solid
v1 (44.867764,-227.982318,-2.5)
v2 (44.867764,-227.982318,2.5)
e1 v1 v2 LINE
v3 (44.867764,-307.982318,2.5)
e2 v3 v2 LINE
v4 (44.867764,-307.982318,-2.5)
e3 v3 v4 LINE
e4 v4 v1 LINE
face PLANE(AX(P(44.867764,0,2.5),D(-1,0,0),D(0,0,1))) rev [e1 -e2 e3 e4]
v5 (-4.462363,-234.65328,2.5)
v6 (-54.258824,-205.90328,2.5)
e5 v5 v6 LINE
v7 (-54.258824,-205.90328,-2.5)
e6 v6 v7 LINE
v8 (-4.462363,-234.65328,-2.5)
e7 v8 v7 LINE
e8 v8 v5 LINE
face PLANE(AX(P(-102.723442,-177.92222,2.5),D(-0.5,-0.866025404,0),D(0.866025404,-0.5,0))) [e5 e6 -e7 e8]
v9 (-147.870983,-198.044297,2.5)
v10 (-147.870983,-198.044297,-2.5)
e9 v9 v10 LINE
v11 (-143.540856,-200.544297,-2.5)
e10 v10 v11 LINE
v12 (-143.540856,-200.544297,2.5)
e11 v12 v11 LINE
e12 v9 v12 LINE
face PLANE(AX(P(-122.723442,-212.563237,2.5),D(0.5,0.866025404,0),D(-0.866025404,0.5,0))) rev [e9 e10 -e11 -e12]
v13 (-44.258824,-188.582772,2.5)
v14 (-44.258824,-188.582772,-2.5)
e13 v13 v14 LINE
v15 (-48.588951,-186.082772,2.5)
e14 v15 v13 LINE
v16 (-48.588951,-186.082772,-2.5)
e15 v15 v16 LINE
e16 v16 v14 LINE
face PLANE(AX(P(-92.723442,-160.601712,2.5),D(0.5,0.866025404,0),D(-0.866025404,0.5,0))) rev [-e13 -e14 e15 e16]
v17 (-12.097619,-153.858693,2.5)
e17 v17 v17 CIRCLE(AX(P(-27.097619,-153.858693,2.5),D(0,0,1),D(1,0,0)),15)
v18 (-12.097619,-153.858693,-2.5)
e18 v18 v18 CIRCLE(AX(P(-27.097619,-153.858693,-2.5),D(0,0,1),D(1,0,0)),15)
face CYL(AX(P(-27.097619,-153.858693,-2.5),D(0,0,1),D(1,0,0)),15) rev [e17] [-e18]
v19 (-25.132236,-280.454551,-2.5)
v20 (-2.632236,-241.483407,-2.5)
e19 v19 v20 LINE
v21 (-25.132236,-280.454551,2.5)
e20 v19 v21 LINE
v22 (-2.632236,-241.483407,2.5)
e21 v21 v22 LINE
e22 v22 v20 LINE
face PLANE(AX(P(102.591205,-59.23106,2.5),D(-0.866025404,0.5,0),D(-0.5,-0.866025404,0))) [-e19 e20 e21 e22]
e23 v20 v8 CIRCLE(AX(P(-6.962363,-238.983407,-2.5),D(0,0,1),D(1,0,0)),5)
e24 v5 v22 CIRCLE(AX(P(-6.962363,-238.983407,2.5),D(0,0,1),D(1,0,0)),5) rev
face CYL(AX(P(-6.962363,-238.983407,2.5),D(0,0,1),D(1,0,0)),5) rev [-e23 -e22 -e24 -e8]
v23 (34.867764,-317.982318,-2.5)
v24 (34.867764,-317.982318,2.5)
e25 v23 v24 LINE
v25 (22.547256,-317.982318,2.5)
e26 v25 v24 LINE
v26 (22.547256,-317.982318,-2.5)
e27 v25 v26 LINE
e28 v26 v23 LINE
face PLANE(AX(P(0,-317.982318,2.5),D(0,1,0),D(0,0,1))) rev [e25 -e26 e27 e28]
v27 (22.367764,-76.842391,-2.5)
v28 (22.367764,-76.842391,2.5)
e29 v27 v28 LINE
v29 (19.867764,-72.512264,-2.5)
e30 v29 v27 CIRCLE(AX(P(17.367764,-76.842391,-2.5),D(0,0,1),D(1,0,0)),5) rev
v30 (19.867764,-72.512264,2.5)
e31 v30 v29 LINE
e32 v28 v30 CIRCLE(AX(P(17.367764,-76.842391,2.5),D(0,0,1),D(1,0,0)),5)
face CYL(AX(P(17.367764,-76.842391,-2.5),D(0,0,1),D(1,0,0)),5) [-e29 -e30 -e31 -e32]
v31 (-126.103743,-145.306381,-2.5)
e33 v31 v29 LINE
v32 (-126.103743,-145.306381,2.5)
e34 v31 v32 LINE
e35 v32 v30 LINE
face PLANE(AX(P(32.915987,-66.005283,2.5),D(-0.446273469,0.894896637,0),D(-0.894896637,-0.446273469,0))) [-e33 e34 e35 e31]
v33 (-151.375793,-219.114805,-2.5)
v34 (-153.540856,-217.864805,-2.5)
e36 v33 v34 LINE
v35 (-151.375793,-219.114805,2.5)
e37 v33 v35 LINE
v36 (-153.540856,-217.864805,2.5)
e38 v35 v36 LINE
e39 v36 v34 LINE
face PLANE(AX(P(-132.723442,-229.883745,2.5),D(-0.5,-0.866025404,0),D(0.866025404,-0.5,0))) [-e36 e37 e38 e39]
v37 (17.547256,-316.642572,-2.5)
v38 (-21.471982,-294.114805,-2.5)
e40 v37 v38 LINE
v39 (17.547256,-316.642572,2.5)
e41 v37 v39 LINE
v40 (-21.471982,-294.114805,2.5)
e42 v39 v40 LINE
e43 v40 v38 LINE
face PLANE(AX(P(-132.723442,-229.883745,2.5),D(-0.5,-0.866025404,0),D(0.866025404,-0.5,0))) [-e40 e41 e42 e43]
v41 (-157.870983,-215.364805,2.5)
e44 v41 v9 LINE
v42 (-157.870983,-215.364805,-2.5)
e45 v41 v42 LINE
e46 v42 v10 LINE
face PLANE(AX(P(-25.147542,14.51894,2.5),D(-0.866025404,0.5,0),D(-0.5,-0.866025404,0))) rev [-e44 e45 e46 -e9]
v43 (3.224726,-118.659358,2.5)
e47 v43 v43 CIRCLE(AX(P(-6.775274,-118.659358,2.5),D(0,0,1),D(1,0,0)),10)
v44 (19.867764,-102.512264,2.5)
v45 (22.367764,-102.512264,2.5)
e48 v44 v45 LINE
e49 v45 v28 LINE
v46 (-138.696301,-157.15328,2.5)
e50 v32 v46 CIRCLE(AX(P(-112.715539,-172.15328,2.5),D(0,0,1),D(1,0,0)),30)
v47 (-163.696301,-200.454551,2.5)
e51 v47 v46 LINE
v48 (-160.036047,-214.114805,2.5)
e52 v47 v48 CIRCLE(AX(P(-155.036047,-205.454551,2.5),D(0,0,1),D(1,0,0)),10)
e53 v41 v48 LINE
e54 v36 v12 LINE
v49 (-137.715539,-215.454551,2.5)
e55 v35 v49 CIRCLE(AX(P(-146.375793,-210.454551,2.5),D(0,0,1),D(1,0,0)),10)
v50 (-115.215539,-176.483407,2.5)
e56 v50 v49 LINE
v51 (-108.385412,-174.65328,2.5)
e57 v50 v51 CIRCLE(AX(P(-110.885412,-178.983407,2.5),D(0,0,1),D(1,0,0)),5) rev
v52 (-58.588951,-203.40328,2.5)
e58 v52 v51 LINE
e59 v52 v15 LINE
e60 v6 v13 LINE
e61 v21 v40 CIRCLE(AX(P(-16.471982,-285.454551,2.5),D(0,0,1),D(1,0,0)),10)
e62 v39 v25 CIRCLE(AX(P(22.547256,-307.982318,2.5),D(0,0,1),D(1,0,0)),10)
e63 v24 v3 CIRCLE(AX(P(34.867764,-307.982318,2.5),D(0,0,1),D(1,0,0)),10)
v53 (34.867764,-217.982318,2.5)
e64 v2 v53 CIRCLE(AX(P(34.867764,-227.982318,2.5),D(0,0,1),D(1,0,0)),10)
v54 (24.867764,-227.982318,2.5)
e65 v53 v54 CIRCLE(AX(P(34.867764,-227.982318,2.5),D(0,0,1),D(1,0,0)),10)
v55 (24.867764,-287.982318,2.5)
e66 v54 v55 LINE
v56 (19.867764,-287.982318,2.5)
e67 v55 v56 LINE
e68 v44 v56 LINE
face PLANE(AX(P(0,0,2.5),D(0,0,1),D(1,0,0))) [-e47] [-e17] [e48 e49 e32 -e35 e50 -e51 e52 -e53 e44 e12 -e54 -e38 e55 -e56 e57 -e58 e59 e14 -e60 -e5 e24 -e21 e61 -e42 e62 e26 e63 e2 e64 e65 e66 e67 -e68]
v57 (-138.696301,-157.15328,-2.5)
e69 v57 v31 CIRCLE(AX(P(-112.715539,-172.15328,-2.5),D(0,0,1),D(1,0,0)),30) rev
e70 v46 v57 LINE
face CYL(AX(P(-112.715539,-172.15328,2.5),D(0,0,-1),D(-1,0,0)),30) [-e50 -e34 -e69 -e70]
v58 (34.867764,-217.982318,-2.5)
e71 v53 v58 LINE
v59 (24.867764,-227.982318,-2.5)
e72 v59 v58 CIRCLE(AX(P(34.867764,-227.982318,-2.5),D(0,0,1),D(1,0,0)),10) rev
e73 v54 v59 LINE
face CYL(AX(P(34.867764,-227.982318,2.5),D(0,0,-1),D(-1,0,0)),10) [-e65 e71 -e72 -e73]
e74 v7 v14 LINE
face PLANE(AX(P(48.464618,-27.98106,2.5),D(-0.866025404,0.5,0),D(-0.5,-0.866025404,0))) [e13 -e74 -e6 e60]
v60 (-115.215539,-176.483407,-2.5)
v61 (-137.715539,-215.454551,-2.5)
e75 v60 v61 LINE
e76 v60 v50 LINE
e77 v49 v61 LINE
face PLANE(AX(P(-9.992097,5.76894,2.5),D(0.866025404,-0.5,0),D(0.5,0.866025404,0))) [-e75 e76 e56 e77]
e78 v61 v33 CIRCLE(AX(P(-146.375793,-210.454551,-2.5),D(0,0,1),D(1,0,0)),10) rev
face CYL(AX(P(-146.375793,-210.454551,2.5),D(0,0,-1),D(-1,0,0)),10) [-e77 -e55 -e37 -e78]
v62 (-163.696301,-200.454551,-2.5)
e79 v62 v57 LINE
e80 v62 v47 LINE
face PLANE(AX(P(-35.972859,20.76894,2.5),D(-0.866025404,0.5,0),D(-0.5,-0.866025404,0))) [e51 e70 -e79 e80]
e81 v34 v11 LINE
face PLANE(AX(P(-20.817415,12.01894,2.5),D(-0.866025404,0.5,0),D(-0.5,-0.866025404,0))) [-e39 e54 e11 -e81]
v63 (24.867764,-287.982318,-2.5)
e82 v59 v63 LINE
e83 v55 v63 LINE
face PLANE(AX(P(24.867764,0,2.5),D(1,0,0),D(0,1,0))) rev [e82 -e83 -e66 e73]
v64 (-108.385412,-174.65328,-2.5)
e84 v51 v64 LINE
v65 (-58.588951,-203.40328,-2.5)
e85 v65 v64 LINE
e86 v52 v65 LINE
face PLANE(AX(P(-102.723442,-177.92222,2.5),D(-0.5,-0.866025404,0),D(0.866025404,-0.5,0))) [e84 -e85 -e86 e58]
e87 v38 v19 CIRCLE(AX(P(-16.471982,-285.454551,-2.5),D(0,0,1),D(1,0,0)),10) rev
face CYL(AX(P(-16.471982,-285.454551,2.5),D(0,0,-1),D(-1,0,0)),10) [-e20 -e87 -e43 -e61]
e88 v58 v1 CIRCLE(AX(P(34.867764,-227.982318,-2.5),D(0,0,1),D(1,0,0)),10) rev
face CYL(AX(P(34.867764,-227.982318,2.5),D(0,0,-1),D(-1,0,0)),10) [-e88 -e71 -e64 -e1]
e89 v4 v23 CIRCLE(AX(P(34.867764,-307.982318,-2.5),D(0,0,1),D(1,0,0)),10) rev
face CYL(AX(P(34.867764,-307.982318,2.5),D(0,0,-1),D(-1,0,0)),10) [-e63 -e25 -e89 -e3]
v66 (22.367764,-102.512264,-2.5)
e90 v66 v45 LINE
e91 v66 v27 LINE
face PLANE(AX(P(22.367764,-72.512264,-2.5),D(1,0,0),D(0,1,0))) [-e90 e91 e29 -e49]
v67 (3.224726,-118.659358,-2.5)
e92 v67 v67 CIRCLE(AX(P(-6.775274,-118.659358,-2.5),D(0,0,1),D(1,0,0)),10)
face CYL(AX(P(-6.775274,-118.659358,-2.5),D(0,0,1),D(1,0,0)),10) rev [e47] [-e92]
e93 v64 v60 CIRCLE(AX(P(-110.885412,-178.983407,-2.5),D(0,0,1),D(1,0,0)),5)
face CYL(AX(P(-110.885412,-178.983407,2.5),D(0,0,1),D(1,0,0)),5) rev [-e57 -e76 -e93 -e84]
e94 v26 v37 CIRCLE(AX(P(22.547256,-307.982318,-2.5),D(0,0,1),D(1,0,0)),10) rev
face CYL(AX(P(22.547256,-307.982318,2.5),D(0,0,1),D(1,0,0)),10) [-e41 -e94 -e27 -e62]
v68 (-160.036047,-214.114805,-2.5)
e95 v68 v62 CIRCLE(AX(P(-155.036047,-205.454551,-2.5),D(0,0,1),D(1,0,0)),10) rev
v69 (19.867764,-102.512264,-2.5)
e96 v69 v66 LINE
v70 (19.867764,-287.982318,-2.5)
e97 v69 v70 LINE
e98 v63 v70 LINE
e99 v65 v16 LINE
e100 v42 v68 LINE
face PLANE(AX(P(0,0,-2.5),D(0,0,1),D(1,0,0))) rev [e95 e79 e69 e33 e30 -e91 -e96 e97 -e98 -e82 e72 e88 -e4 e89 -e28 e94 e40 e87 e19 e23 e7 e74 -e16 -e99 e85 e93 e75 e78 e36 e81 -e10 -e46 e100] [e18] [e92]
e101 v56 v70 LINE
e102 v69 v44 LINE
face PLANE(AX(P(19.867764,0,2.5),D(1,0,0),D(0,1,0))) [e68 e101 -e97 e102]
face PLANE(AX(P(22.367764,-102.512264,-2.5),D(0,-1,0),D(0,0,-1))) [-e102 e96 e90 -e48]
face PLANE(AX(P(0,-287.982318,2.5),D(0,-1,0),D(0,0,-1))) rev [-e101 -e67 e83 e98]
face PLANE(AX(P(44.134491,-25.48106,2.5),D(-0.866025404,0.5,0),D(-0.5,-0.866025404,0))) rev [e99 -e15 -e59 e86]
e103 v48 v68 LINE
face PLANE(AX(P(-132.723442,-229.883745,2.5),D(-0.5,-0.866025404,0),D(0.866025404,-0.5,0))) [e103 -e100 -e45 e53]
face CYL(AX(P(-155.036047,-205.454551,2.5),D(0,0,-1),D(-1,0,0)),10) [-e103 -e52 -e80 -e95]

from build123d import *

# Parameters (mm, degrees)
BOSS_EXTRUDE1_DEPTH = 2.5
FILLET1_R           = 10
SKETCH2_W           = 2.5
SKETCH2_H           = 30
BOSS_EXTRUDE2_DEPTH = 5
FILLET2_R           = 5
SKETCH3_R           = 15
SKETCH3_R_2         = 10
CUT_EXTRUDE1_DEPTH  = 5
FILLET3_R           = 30
FILLET4_R           = 5


# Some blends are built 0.0001 mm under size
with BuildPart() as part:
    # Sketch1 → Boss-Extrude1 (new, symmetric)
    with BuildSketch(Plane.XY):
        Polygon((-30.132236367, -289.114804685), (19.867763633, -317.982318144), (44.867763633, -317.982318144), (44.867763633, -217.982318144), (24.867763633, -217.982318144), (24.867763633, -287.982318144), (19.867763633, -287.982318144), (19.867763633, -72.512264306), (-134.182504853, -149.335156244), (-168.696300973, -209.114804685), (-157.870983425, -215.364804685), (-147.870983425, -198.044296609), (-143.540856406, -200.544296609), (-153.540856406, -217.864804685), (-142.715538859, -224.114804685), (-112.715538859, -172.153280458), (-58.588951122, -203.403280458), (-48.588951122, -186.082772382), (-44.258824104, -188.582772382), (-54.258824104, -205.903280458), (-0.132236367, -237.153280458), align=None)
    extrude(amount=BOSS_EXTRUDE1_DEPTH, both=True)

    # Fillet1
    fillet1_edges = [part.edges().sort_by_distance(p)[0] for p in [
        (-168.696300973, -209.114804685, 0),
        (-142.715538859, -224.114804685, 0),
        (-30.132236367, -289.114804685, 0),
        (19.867763633, -317.982318144, 0),
        (24.867763633, -217.982318144, 0),
        (44.867763633, -217.982318144, 0),
        (44.867763633, -317.982318144, 0),
    ]]
    fillet(fillet1_edges, radius=FILLET1_R - 0.0001)  # a hair under: the kernel refuses the full size

    # Sketch2 → Boss-Extrude2 (add)
    with BuildSketch(Plane.XY.offset(2.5)):
        with Locations((21.117763633, -87.512264306)):
            Rectangle(SKETCH2_W, SKETCH2_H)
    extrude(amount=-BOSS_EXTRUDE2_DEPTH)

    # Fillet2
    # the kernel refuses this fillet: 5 mm, written as the material it takes off along each edge
    with BuildSketch(Plane(origin=(22.367763633, -72.512264306, 13.325317547), x_dir=(-1, 0, 0), z_dir=(0, 0, -1))) as fillet2_piece_1:
        with BuildLine():
            CenterArc((5, -4.330127019), FILLET2_R, 120, 60)
            Line((0, -4.330127019), (-0.1, -4.330127019))
            Line((-0.1, -4.330127019), (-0.1, 0))
            Line((-0.1, 0), (0, 0.1))
            ThreePointArc((0, 0.1), (1.25, 0.1), (2.45, 0.08660254))
            Line((2.45, 0.08660254), (2.5, 0))
        make_face()
    extrude(amount=26.650635095, mode=Mode.SUBTRACT)

    # Sketch3 → Cut-Extrude1 (cut)
    with BuildSketch(Plane.XY.offset(2.5)):
        with Locations((-27.097618997, -153.858693218)):
            Circle(SKETCH3_R)
        with Locations((-6.775273551, -118.659358377)):
            Circle(SKETCH3_R_2)
    extrude(amount=-CUT_EXTRUDE1_DEPTH, mode=Mode.SUBTRACT)

    # Fillet3
    fillet3_edges = [part.edges().sort_by_distance(p)[0] for p in [
        (-134.182504853, -149.335156244, 0),
    ]]
    fillet(fillet3_edges, radius=FILLET3_R)

    # Fillet4
    fillet4_edges = [part.edges().sort_by_distance(p)[0] for p in [
        (-112.715538859, -172.153280458, 0),
        (-0.132236367, -237.153280458, 0),
    ]]
    fillet(fillet4_edges, radius=FILLET4_R)


solid = part.part
